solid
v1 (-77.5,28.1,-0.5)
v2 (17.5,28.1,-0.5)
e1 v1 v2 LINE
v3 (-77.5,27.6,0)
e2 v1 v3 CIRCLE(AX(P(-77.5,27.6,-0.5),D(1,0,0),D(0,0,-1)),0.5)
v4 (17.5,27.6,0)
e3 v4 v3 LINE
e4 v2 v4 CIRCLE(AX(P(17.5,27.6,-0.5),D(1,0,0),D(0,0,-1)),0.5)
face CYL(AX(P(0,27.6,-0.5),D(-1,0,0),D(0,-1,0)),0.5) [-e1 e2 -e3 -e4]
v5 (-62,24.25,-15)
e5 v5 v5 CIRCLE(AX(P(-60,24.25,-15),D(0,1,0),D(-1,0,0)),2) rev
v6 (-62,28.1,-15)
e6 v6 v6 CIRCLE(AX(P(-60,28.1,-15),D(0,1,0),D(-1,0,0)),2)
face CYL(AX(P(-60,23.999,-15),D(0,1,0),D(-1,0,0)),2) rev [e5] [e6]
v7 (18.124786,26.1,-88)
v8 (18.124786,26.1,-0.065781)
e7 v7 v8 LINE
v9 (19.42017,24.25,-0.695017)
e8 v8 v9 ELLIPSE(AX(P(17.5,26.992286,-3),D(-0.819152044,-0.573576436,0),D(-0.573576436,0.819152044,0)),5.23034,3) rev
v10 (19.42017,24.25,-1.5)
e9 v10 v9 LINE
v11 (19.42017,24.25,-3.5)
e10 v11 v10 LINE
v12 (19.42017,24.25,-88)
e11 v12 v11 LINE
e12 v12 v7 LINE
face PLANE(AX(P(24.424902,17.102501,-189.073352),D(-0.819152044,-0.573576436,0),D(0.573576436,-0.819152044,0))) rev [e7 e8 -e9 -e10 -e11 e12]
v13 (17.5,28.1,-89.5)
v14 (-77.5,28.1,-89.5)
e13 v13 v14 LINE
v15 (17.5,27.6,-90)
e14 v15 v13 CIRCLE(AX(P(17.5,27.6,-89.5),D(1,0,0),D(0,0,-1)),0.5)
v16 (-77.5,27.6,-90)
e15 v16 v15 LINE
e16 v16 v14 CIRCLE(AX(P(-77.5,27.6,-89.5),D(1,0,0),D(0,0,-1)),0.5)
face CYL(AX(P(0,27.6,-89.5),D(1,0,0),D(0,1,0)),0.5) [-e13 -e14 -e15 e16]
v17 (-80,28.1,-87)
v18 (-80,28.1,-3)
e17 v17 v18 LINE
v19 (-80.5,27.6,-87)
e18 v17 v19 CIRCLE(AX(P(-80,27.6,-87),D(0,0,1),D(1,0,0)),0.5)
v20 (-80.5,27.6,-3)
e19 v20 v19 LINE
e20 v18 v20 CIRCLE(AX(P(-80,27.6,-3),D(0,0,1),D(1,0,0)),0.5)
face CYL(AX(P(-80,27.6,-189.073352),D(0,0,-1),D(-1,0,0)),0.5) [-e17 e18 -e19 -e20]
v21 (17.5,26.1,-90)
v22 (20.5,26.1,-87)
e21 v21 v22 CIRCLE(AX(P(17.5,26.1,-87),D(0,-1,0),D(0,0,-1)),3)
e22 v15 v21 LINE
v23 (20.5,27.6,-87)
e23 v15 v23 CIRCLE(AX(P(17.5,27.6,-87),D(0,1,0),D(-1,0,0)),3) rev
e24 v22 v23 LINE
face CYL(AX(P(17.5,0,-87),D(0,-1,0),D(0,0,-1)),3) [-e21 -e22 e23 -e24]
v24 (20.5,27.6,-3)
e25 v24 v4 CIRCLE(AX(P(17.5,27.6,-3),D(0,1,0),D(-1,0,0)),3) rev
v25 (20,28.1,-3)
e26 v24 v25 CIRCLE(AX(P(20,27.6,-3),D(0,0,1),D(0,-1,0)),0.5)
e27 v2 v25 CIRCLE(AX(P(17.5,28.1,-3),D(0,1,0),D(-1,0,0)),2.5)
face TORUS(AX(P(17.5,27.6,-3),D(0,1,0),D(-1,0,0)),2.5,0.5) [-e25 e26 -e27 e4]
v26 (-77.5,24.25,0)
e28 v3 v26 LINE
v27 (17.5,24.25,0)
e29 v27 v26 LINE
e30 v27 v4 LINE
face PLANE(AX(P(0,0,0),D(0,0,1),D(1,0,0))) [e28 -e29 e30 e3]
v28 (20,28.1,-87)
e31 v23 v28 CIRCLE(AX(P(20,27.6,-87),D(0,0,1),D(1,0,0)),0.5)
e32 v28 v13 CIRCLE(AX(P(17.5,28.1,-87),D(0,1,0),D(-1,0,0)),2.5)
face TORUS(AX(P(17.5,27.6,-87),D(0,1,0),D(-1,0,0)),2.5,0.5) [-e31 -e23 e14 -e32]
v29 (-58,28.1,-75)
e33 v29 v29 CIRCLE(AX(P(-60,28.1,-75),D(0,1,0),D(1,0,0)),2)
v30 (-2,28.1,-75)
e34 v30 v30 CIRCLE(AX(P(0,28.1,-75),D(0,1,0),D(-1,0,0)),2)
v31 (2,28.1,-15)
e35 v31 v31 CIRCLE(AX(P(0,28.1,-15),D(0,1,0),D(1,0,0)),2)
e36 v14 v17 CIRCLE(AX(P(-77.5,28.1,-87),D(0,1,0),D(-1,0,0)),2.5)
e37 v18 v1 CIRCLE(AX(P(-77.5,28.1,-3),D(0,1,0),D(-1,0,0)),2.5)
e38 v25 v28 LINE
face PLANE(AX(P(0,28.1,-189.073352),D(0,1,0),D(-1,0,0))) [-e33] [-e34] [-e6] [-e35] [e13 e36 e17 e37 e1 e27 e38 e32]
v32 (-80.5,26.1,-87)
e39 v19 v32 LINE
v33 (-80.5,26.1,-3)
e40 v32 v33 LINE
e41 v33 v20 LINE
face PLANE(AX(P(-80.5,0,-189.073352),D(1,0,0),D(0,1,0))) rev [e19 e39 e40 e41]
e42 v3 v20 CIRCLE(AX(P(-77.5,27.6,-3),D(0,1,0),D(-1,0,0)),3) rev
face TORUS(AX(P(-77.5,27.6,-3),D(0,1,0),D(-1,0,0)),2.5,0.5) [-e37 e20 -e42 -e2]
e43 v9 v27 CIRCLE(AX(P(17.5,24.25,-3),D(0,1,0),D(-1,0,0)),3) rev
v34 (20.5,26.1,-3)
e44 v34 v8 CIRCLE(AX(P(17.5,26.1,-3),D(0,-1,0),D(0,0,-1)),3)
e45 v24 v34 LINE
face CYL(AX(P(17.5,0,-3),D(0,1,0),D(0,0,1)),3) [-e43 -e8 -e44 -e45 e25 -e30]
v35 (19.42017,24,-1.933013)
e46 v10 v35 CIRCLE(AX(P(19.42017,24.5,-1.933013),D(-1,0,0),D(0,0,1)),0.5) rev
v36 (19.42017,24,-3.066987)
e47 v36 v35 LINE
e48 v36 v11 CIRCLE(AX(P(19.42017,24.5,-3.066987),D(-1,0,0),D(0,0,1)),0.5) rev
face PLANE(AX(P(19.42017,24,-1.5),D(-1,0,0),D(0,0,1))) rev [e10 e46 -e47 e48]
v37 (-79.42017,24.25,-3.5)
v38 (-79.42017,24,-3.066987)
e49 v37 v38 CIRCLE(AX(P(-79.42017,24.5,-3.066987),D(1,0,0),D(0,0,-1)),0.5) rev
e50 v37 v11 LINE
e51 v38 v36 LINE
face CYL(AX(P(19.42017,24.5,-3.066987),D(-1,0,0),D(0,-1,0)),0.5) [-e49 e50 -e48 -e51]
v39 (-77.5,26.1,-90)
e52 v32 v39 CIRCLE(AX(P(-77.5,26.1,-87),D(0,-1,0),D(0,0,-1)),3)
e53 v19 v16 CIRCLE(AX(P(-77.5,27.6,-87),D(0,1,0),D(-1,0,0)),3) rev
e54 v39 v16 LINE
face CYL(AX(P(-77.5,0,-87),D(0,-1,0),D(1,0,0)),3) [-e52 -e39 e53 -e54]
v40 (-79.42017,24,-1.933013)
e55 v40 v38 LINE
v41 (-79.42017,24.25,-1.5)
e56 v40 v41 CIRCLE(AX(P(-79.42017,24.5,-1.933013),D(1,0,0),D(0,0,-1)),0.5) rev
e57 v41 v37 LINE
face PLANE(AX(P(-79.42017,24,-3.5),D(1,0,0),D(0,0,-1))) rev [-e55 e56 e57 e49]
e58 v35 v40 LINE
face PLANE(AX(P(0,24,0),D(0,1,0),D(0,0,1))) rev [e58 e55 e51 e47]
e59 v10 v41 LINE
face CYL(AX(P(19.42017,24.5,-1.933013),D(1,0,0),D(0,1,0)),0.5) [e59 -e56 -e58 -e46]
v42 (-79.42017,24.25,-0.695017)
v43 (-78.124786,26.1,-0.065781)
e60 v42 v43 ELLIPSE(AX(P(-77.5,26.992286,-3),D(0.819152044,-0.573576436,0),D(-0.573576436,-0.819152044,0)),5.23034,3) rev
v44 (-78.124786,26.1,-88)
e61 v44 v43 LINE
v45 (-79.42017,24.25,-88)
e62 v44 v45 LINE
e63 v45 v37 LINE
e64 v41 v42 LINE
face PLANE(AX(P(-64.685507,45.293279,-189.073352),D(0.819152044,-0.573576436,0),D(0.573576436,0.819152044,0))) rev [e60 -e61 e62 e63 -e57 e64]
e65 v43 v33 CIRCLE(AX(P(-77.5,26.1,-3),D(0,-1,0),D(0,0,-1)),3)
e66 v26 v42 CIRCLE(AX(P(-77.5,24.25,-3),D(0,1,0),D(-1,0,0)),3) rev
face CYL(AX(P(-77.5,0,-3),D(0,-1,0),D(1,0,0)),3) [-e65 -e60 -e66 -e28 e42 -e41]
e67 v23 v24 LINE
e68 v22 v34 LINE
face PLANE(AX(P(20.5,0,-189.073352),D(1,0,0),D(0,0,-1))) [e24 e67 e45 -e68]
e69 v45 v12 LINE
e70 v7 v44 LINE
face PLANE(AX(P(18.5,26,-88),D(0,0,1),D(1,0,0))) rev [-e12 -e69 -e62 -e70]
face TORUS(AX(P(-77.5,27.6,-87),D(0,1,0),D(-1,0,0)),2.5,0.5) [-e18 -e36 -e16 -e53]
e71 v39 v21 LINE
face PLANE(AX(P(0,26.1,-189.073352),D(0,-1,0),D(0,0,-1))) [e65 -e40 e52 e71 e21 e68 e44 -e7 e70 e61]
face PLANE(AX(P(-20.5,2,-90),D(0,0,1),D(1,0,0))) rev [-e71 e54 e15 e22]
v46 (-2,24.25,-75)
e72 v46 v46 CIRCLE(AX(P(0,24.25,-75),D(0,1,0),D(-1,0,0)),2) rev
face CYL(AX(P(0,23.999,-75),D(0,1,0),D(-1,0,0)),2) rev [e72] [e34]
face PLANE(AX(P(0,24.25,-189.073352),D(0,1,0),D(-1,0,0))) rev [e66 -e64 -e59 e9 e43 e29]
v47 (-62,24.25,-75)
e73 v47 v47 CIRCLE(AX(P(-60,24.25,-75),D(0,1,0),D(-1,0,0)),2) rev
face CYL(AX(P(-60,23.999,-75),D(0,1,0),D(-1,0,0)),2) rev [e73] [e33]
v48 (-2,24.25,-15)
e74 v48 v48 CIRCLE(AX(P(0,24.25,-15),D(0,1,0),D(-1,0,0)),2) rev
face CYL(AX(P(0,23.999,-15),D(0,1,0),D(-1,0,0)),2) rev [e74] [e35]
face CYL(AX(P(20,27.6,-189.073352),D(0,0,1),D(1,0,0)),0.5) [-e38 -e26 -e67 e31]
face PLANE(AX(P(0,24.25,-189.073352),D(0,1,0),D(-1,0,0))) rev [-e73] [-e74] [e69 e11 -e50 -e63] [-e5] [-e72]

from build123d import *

# Parameters (mm, degrees)
BOSS_EXTRUDE1_DEPTH = 88
SKETCH2_W           = 101
SKETCH2_H           = 2
BOSS_EXTRUDE2_DEPTH = 2
SKETCH3_W           = 98.84033909
SKETCH3_H           = 2
BOSS_EXTRUDE3_DEPTH = 0.25
FILLET2_R           = 0.5
FILLET1_R           = 3
CUT_EXTRUDE1_REACH  = 122.818
SKETCH4_R           = 2
FILLET3_R           = 0.5


with BuildPart() as part:
    # Sketch1 → Boss-Extrude1 (new body)
    with BuildSketch(Plane.XY):
        Polygon((19.420169545, 24.25), (18.194806353, 26), (18.124785599, 26.1), (20.5, 26.1), (20.5, 28.1), (-80.5, 28.1), (-80.5, 26.1), (-78.124785599, 26.1), (-79.420169545, 24.25), align=None)
    extrude(amount=-BOSS_EXTRUDE1_DEPTH)

    # Sketch2 → Boss-Extrude2 (add)
    with BuildSketch(Plane(origin=(0, 0, -88), x_dir=(-1, 0, 0), z_dir=(0, 0, -1))):
        with Locations((30, 27.1)):
            Rectangle(SKETCH2_W, SKETCH2_H)
    extrude(amount=BOSS_EXTRUDE2_DEPTH)

    # Sketch3 → Boss-Extrude3 (add)
    with BuildSketch(Plane.XZ.offset(-24.25)):
        with Locations((-30, -2.5)):
            Rectangle(SKETCH3_W, SKETCH3_H)
    extrude(amount=BOSS_EXTRUDE3_DEPTH)

    # Fillet2
    # the kernel refuses this fillet: 0.5 mm, written as the material it takes off along each edge
    with BuildSketch(Plane(origin=(-80.502701299, 24, -3.5), x_dir=(0, 0, 1), z_dir=(1, 0, 0))) as fillet2_piece_1:
        with BuildLine():
            CenterArc((0.433012702, -0.5), FILLET2_R, 90, 60)
            Line((0, -0.25), (-0.008660254, -0.245))
            ThreePointArc((-0.008660254, -0.245), (-0.01, -0.125), (-0.01, 0))
            Line((-0.01, 0), (0, 0.01))
            Line((0, 0.01), (0.433012702, 0.01))
            Line((0.433012702, 0.01), (0.433012702, 0))
        make_face()
    extrude(amount=101.005402599, mode=Mode.SUBTRACT)
    with BuildSketch(Plane(origin=(20.502701299, 24, -1.5), x_dir=(0, 1, 0), z_dir=(-1, 0, 0))) as fillet2_piece_2:
        with BuildLine():
            CenterArc((0.5, 0.433012702), FILLET2_R, 180, 60)
            Line((0, 0.433012702), (-0.01, 0.433012702))
            Line((-0.01, 0.433012702), (-0.01, 0))
            Line((-0.01, 0), (0, -0.01))
            ThreePointArc((0, -0.01), (0.125, -0.01), (0.245, -0.008660254))
            Line((0.245, -0.008660254), (0.25, 0))
        make_face()
    extrude(amount=101.005402599, mode=Mode.SUBTRACT)

    # Fillet1
    fillet1_edges = [part.edges().sort_by_distance(p)[0] for p in [
        (-80.5, 27.1, -90),
        (20.5, 27.1, -90),
        (20.5, 27.1, 0),
        (-80.5, 27.1, 0),
    ]]
    fillet(fillet1_edges, radius=FILLET1_R)

    # Sketch4 → Cut-Extrude1 (cut, up to next)
    with BuildSketch(Plane(origin=(0, 28.1, 0), x_dir=(1, 0, 0), z_dir=(0, 1, 0)), mode=Mode.PRIVATE) as cut_extrude1_sk1:
        with Locations(Location((0, 75, 0), (0, 0, 180))):
            Circle(SKETCH4_R)
    cut_extrude1_tool1 = extrude(cut_extrude1_sk1.sketch, amount=-CUT_EXTRUDE1_REACH, mode=Mode.PRIVATE) & part.part
    # Sketch4 → Cut-Extrude1 (cut, up to next)
    with BuildSketch(Plane(origin=(0, 28.1, 0), x_dir=(1, 0, 0), z_dir=(0, 1, 0)), mode=Mode.PRIVATE) as cut_extrude1_sk2:
        with Locations(Location((0, 15, 0), (0, 0, 180))):
            Circle(SKETCH4_R)
    cut_extrude1_tool2 = extrude(cut_extrude1_sk2.sketch, amount=-CUT_EXTRUDE1_REACH, mode=Mode.PRIVATE) & part.part
    # Sketch4 → Cut-Extrude1 (cut, up to next)
    with BuildSketch(Plane(origin=(0, 28.1, 0), x_dir=(1, 0, 0), z_dir=(0, 1, 0)), mode=Mode.PRIVATE) as cut_extrude1_sk3:
        with Locations(Location((-60, 15, 0), (0, 0, 180))):
            Circle(SKETCH4_R)
    cut_extrude1_tool3 = extrude(cut_extrude1_sk3.sketch, amount=-CUT_EXTRUDE1_REACH, mode=Mode.PRIVATE) & part.part
    # Sketch4 → Cut-Extrude1 (cut, up to next)
    with BuildSketch(Plane(origin=(0, 28.1, 0), x_dir=(1, 0, 0), z_dir=(0, 1, 0)), mode=Mode.PRIVATE) as cut_extrude1_sk4:
        with Locations(Location((-60, 75, 0), (0, 0, 180))):
            Circle(SKETCH4_R)
    cut_extrude1_tool4 = extrude(cut_extrude1_sk4.sketch, amount=-CUT_EXTRUDE1_REACH, mode=Mode.PRIVATE) & part.part
    add(cut_extrude1_tool1.solids().sort_by_distance((0, 28.1, -75))[0], mode=Mode.SUBTRACT)
    add(cut_extrude1_tool2.solids().sort_by_distance((0, 28.1, -15))[0], mode=Mode.SUBTRACT)
    add(cut_extrude1_tool3.solids().sort_by_distance((-60, 28.1, -15))[0], mode=Mode.SUBTRACT)
    add(cut_extrude1_tool4.solids().sort_by_distance((-60, 28.1, -75))[0], mode=Mode.SUBTRACT)

    # Fillet3
    fillet3_edges = [part.edges().sort_by_distance(p)[0] for p in [
        (-30, 28.1, 0),
        (20.5, 28.1, -45),
        (-30, 28.1, -90),
        (-80.5, 28.1, -45),
        (-79.621320344, 28.1, -89.121320344),
        (19.621320344, 28.1, -89.121320344),
        (-79.621320344, 28.1, -0.878679656),
        (19.621320344, 28.1, -0.878679656),
    ]]
    fillet(fillet3_edges, radius=FILLET3_R)


solid = part.part
